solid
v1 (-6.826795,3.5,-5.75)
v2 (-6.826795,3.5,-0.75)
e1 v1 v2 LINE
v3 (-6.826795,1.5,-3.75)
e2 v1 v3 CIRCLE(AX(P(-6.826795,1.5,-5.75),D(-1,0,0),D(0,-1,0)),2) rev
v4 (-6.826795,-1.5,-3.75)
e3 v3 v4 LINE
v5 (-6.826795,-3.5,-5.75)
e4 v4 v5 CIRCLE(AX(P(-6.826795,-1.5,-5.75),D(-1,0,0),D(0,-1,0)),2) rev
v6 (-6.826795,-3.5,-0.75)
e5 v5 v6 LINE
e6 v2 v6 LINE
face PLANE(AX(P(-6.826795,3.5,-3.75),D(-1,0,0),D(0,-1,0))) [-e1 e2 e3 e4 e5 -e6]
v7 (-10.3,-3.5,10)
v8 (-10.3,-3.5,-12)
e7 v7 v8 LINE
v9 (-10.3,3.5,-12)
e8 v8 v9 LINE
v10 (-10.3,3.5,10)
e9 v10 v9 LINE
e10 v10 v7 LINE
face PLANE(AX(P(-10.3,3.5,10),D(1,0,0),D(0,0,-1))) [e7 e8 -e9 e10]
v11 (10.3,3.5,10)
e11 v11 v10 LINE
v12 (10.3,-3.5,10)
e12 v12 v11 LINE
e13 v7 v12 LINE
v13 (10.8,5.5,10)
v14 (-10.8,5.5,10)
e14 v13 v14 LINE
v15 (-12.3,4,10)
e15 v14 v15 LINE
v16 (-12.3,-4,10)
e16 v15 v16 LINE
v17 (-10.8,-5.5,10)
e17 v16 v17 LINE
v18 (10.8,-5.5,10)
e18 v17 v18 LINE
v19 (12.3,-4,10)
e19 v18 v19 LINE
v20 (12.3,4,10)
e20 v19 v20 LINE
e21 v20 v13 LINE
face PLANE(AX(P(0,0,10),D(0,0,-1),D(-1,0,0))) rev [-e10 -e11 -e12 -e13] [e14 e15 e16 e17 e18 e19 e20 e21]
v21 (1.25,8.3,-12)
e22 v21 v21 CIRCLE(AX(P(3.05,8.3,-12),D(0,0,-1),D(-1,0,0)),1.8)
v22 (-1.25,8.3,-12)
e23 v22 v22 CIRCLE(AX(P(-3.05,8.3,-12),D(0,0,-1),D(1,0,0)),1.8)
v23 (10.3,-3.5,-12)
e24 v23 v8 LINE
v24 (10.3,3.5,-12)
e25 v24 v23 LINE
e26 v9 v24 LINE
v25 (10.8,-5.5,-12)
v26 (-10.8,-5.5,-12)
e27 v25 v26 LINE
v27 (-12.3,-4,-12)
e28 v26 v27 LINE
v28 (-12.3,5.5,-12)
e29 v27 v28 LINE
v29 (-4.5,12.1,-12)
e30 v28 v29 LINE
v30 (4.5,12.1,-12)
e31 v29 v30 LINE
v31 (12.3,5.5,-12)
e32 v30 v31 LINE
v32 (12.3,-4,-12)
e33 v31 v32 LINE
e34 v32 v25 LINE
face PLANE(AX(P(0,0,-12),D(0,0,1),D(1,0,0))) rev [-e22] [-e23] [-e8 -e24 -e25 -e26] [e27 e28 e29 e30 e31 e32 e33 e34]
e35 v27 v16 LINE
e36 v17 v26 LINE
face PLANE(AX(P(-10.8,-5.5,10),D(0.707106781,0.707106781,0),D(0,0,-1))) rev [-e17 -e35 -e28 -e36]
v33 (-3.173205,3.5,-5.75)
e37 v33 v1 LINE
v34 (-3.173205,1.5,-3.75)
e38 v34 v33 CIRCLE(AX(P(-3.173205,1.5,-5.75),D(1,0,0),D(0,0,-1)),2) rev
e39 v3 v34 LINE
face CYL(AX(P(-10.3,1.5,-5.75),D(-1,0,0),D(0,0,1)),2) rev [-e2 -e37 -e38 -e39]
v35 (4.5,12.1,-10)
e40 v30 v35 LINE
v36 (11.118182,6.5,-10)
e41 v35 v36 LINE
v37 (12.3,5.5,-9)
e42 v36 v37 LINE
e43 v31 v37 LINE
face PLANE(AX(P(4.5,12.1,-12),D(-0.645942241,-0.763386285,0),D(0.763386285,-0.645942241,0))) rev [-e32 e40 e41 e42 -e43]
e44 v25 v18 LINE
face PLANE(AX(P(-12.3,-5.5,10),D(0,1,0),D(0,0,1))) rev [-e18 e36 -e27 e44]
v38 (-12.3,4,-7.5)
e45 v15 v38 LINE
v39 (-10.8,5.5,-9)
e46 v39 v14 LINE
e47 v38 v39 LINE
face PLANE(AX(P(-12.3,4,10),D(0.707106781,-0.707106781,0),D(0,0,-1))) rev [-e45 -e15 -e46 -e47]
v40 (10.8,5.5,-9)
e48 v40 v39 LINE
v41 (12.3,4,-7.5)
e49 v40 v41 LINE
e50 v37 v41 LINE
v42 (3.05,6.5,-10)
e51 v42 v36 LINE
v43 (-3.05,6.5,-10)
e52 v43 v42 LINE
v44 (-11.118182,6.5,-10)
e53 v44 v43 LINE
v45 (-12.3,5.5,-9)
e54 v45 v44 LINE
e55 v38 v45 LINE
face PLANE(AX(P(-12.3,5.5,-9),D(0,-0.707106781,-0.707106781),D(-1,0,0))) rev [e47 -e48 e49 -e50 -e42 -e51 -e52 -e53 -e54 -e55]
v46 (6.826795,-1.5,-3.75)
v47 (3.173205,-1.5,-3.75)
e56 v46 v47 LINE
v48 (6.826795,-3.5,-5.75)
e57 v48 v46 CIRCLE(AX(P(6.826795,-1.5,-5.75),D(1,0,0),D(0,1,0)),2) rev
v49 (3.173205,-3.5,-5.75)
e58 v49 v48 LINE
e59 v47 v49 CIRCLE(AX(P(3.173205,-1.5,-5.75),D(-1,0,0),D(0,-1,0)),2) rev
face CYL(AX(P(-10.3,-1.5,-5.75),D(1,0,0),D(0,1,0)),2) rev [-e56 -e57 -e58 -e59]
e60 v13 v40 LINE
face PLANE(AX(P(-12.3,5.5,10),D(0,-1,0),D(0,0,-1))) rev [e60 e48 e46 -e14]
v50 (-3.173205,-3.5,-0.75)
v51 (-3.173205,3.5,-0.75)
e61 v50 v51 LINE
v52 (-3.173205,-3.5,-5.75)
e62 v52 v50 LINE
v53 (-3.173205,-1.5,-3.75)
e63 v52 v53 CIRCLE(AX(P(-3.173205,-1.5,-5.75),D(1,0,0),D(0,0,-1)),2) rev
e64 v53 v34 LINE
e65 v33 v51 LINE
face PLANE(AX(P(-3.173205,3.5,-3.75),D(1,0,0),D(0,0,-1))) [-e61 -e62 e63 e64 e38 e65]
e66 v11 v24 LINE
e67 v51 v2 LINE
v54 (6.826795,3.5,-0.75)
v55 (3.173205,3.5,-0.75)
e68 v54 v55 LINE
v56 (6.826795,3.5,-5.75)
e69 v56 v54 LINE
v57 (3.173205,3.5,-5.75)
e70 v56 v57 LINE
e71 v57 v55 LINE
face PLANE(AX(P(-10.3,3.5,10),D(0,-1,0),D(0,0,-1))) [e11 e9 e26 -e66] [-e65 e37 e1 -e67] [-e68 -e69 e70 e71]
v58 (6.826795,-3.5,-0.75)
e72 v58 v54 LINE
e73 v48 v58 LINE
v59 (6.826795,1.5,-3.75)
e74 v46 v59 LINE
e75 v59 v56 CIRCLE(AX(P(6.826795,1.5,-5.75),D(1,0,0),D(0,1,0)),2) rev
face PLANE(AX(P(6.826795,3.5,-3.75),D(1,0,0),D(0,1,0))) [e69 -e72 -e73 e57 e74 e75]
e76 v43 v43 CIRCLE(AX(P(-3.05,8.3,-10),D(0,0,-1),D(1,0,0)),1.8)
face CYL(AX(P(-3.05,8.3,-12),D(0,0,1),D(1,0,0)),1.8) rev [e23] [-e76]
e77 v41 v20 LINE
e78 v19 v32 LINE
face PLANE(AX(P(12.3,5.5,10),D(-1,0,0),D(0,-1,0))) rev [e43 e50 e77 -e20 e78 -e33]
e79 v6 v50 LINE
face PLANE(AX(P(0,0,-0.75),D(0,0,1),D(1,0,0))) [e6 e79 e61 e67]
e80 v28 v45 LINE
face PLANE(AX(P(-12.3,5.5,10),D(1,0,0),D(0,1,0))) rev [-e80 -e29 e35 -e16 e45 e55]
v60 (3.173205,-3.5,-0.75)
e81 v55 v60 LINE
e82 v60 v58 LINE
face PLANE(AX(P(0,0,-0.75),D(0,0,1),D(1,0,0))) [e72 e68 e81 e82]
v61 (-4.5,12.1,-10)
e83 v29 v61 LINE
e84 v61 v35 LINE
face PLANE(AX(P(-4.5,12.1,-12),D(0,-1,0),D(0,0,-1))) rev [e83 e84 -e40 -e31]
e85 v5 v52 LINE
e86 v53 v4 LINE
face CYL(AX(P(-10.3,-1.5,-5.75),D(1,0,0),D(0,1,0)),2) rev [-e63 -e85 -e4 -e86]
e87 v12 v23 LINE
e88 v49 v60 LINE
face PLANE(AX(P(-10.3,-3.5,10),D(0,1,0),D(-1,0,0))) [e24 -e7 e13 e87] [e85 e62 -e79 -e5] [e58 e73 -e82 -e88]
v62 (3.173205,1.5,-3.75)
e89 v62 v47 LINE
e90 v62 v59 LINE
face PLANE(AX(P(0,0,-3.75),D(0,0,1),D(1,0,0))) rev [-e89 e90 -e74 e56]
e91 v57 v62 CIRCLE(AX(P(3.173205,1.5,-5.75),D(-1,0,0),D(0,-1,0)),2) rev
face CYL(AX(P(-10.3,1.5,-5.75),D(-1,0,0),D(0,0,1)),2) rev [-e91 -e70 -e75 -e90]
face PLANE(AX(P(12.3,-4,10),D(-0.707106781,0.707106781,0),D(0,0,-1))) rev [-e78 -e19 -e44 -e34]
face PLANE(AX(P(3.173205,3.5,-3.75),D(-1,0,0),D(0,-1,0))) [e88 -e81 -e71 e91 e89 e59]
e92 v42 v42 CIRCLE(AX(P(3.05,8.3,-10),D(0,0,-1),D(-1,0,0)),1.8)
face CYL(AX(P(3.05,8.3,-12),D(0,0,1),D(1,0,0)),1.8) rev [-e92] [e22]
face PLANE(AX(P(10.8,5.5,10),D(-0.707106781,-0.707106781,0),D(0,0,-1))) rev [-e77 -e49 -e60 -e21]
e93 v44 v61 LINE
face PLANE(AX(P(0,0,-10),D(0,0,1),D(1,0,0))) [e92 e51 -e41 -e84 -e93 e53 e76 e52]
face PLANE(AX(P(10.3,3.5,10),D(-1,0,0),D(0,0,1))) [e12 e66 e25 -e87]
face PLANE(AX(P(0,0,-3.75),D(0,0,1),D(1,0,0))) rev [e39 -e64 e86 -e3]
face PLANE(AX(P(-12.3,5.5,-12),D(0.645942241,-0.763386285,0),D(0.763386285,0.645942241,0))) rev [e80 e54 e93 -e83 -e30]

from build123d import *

# Parameters (mm, degrees)
ESBO_O1_W                = 24.6
ESBO_O1_H                = 11
ESBO_O1_W_2              = 20.6
ESBO_O1_H_2              = 7
RESSALTO_EXTRUS_O1_DEPTH = 10
ESBO_O2_R                = 1.8
ESBO_O2_W                = 20.6
ESBO_O2_H                = 7
RESSALTO_EXTRUS_O2_DEPTH = 2
CHANFRO4_SIZE            = 1
CHANFRO2_SIZE            = 1.5
ESBO_O3_W                = 3.653589711
ESBO_O3_H                = 7
ESBO_O3_W_2              = 3.653589584
RESSALTO_EXTRUS_O3_DEPTH = 3
FILETE3_R                = 2


with BuildPart() as part:
    # Esboço1 → Ressalto-extrusão1 (new, symmetric)
    with BuildSketch(Plane.XY):
        Rectangle(ESBO_O1_W, ESBO_O1_H)
        Rectangle(ESBO_O1_W_2, ESBO_O1_H_2, mode=Mode.SUBTRACT)
    extrude(amount=RESSALTO_EXTRUS_O1_DEPTH, both=True)

    # Esboço2 → Ressalto-extrusão2 (add)
    with BuildSketch(Plane(origin=(0, 0, -10), x_dir=(-1, 0, 0), z_dir=(0, 0, -1))):
        Polygon((-12.3, -5.5), (-12.3, 5.5), (-4.5, 12.1), (4.5, 12.1), (12.3, 5.5), (12.3, -5.5), align=None)
        with Locations((-3.05, 8.3)):
            Circle(ESBO_O2_R, mode=Mode.SUBTRACT)
        with Locations(Location((3.05, 8.3, 0), (0, 0, 180))):
            Circle(ESBO_O2_R, mode=Mode.SUBTRACT)
        Rectangle(ESBO_O2_W, ESBO_O2_H, mode=Mode.SUBTRACT)
    extrude(amount=RESSALTO_EXTRUS_O2_DEPTH)

    # Chanfro4
    chanfro4_edges = [part.edges().sort_by_distance(p)[0] for p in [
        (0, 5.5, -10),
    ]]
    chamfer(chanfro4_edges, length=CHANFRO4_SIZE - 0.0001)  # a hair under: the kernel refuses the full size

    # Chanfro2
    chanfro2_edges = [part.edges().sort_by_distance(p)[0] for p in [
        (12.3, 5.5, 0.49995),
        (12.3, -5.5, -1),
        (-12.3, -5.5, -1),
        (-12.3, 5.5, 0.49995),
    ]]
    chamfer(chanfro2_edges, length=CHANFRO2_SIZE)

    # Esboço3 → Ressalto-extrusão3 (add)
    with BuildSketch(Plane.XY.offset(-0.75)):
        with Locations((-5.000000063, 0)):
            Rectangle(ESBO_O3_W, ESBO_O3_H)
        with Locations((5, 0)):
            Rectangle(ESBO_O3_W_2, ESBO_O3_H)
    extrude(amount=-RESSALTO_EXTRUS_O3_DEPTH)

    # Filete3
    filete3_edges = [part.edges().sort_by_distance(p)[0] for p in [
        (-5.000000064, 3.5, -3.75),
        (-5.000000064, -3.5, -3.75),
        (5, 3.5, -3.75),
        (5, -3.5, -3.75),
    ]]
    fillet(filete3_edges, radius=FILETE3_R)


solid = part.part
